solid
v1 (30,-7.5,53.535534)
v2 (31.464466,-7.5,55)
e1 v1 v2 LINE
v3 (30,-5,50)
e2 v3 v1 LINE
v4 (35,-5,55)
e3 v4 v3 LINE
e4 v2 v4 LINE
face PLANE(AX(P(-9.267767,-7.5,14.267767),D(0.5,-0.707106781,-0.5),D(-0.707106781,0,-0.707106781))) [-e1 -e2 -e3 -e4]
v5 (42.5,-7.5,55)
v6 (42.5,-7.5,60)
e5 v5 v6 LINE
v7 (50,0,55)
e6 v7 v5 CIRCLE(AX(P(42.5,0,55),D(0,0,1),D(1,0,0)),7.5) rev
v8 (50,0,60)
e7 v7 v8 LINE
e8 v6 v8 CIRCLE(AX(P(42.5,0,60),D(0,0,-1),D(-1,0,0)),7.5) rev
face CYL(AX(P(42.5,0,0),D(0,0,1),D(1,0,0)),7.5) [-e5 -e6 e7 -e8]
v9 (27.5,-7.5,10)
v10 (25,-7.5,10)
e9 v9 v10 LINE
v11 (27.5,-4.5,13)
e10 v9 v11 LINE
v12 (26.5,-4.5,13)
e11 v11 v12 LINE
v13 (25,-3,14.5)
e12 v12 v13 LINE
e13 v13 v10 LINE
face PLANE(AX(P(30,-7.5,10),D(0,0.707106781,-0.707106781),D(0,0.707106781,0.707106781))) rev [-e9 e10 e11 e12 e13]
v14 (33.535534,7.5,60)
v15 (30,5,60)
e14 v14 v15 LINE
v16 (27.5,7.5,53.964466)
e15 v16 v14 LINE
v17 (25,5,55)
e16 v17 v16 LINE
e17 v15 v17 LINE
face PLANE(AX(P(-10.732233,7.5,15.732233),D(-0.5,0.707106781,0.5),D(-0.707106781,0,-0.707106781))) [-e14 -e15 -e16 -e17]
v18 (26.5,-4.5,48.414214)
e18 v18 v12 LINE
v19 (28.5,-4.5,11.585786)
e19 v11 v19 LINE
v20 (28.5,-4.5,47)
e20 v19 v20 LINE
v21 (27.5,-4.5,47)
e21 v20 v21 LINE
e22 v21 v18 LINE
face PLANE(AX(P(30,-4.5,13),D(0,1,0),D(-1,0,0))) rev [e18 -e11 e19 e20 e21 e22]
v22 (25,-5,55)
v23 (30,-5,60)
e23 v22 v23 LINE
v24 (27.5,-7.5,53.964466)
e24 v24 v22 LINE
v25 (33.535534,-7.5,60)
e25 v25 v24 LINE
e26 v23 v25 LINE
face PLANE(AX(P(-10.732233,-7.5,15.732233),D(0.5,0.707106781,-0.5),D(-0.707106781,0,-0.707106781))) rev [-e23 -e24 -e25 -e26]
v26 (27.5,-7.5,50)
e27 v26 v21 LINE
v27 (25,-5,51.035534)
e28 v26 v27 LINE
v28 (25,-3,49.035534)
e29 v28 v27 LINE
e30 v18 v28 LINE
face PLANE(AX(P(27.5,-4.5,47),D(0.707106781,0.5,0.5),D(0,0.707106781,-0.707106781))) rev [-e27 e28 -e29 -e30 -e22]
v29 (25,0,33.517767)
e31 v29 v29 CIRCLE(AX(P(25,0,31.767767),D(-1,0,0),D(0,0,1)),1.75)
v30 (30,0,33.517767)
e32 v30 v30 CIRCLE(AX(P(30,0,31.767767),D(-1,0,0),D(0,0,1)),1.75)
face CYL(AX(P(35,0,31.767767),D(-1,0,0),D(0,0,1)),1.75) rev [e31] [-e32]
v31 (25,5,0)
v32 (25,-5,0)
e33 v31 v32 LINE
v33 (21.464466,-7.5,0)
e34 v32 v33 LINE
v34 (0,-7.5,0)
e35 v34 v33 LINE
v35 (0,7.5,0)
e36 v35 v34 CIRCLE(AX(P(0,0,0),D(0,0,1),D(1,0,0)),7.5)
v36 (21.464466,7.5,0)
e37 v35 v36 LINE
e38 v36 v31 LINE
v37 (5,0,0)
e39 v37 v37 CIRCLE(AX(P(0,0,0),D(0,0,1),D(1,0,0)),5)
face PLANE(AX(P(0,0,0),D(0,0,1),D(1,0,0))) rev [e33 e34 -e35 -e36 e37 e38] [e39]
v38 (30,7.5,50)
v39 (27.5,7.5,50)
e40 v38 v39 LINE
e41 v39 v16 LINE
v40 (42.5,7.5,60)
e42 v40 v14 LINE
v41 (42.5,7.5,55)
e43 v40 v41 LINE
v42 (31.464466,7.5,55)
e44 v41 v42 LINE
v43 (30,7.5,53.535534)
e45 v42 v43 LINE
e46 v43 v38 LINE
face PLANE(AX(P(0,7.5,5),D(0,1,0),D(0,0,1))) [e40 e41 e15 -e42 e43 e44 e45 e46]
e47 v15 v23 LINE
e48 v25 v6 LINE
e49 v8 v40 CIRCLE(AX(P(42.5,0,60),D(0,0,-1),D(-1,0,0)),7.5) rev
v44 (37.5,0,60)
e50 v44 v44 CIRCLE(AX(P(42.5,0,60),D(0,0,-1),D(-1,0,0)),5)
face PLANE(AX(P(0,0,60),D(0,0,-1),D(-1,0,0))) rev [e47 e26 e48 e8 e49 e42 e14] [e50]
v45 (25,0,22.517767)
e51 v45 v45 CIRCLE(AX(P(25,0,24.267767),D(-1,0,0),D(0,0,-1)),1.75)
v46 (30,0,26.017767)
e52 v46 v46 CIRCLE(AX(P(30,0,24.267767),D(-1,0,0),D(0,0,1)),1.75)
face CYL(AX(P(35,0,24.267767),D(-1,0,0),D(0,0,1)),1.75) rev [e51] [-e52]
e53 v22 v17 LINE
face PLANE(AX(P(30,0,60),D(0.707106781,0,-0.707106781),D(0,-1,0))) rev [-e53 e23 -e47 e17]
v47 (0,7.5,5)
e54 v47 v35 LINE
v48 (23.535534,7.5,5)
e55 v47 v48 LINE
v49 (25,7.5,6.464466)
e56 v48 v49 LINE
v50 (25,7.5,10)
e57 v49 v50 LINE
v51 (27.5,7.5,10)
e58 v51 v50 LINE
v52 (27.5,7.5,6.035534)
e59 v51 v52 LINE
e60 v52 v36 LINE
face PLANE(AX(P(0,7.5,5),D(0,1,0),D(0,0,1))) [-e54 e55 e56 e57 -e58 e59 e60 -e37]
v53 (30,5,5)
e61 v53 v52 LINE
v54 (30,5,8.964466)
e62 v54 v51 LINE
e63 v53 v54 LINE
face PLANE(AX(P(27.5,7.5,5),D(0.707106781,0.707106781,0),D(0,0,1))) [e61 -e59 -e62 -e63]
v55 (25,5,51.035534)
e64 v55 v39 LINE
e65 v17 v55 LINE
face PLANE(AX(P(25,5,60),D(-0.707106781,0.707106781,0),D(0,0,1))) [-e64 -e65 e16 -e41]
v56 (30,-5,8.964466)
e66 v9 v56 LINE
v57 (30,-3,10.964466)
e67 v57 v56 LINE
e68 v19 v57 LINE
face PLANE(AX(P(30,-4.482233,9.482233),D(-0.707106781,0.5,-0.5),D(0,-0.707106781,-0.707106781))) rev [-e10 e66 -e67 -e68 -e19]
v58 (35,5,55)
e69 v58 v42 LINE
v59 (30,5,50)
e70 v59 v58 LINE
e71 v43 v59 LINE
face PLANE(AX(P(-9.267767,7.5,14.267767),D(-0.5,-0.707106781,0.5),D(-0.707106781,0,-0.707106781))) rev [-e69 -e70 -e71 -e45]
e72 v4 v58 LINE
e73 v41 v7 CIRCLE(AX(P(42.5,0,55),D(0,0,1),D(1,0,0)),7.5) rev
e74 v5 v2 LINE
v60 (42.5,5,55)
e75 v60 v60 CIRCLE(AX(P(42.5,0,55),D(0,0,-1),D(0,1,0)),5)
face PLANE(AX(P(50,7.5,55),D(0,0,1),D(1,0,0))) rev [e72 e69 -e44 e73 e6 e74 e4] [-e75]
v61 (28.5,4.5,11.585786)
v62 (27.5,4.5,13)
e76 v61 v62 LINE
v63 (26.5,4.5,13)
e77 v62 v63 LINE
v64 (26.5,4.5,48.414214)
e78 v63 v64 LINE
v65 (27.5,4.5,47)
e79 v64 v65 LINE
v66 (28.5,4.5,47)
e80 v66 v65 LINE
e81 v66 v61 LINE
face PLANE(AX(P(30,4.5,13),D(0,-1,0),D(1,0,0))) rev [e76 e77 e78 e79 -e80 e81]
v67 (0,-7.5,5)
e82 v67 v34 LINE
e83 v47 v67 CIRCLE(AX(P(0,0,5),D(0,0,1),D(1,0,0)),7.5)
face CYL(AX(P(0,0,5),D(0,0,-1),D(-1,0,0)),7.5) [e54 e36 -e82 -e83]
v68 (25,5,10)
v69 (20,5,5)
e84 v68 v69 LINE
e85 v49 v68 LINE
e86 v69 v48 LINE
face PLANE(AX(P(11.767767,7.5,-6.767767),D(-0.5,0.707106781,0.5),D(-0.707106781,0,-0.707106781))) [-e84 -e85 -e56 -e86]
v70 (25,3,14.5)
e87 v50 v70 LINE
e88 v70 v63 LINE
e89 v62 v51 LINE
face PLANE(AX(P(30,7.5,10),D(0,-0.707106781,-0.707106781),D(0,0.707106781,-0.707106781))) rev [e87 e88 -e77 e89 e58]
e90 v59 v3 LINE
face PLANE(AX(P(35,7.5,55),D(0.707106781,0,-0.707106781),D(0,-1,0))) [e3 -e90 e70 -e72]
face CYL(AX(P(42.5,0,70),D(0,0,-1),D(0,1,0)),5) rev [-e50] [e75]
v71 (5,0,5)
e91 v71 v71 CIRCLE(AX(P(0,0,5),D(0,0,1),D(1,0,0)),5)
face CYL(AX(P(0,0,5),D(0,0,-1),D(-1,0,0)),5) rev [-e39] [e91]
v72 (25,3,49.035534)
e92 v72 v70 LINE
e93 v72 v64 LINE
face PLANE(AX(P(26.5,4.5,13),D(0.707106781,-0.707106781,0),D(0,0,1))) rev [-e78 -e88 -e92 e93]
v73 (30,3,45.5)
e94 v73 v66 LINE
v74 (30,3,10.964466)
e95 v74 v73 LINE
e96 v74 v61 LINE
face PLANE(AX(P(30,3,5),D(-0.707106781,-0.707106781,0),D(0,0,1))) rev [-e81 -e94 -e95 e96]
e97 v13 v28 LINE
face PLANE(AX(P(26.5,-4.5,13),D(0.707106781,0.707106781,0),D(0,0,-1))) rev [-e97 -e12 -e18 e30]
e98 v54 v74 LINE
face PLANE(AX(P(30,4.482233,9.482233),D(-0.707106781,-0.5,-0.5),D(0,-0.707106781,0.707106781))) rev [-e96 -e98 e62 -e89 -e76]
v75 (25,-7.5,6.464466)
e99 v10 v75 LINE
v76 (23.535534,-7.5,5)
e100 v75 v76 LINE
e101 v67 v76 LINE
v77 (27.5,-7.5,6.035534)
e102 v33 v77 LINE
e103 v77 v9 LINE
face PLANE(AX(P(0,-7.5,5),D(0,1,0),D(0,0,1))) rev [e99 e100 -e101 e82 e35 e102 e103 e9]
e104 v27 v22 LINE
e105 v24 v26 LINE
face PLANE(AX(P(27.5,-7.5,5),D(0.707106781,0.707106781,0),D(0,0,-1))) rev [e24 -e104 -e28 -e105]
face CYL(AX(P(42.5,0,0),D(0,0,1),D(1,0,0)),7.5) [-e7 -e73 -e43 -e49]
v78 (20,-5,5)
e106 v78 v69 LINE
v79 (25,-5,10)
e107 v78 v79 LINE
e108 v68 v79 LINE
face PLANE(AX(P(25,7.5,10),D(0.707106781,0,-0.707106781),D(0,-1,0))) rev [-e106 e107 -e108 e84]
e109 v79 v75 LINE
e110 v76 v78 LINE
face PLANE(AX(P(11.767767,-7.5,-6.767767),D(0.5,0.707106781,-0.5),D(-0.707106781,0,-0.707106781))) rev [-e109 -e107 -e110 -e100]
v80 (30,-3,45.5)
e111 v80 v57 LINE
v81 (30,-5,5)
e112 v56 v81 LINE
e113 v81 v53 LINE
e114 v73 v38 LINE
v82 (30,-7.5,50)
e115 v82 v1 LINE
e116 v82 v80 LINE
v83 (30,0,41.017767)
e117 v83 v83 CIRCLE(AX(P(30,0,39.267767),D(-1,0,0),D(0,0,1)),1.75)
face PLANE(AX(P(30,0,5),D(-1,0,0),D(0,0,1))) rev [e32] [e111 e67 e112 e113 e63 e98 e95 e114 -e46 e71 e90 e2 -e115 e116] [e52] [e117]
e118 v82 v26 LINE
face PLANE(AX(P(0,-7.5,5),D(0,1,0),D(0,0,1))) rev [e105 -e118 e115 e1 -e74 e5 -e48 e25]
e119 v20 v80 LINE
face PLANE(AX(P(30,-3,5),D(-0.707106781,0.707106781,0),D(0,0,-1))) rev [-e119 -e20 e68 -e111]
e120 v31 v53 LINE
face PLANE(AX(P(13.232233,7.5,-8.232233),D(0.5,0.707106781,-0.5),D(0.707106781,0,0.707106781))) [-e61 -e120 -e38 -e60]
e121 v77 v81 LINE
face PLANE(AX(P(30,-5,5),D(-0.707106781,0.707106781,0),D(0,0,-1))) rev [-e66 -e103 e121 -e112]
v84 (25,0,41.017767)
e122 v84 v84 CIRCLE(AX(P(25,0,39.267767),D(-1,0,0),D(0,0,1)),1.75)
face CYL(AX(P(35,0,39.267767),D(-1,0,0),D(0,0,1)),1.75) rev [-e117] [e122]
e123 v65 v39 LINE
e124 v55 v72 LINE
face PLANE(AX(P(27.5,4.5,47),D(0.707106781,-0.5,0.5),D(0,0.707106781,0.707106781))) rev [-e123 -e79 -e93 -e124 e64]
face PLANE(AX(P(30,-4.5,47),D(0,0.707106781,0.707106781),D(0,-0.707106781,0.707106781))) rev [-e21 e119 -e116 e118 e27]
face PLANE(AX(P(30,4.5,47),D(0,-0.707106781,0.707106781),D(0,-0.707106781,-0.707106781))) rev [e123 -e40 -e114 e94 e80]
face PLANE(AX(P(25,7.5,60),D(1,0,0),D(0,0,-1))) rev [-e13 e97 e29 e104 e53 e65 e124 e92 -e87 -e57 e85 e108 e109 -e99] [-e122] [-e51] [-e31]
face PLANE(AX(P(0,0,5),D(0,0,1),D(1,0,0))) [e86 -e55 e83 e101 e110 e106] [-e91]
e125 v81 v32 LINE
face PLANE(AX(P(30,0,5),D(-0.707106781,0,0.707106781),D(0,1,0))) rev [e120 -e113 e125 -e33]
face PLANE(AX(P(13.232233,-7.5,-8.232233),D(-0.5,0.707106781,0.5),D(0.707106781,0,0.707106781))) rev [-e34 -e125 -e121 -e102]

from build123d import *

# Parameters (mm, degrees)
SKETCH1_R           = 7.5
SKETCH1_R_2         = 5
BOSS_EXTRUDE1_DEPTH = 5
SKETCH2_W           = 5
SKETCH2_H           = 15
BOSS_EXTRUDE2_DEPTH = 55
SKETCH3_W           = 5
SKETCH3_H           = 15
BOSS_EXTRUDE3_DEPTH = 20
SKETCH4_R           = 5
CUT_EXTRUDE1_DEPTH  = 15
FILLET1_R           = 7.5
CHAMFER1_SIZE       = 5
CUT_EXTRUDE2_DEPTH  = 5
CHAMFER2_SIZE       = 1.5
CHAMFER3_SIZE       = 2.5
CHAMFER4_SIZE       = 2.5
SKETCH6_R           = 1.75
CUT_EXTRUDE3_DEPTH  = 10


with BuildPart() as part:
    # Sketch1 → Boss-Extrude1 (new body)
    # profile 1 of 2: a face of its own
    with BuildSketch(Plane.XY):
        Circle(SKETCH1_R)
        Circle(SKETCH1_R_2, mode=Mode.SUBTRACT)
    # profile 2 of 2: a face of its own
    with BuildSketch(Plane.XY):
        with BuildLine():
            Line((30, 7.5), (0, 7.5))
            ThreePointArc((0, 7.5), (5.303300859, 5.303300859), (7.5, 0))
            ThreePointArc((7.5, 0), (5.303300859, -5.303300859), (0, -7.5))
            Line((0, -7.5), (30, -7.5))
            Line((30, -7.5), (30, 7.5))
        make_face()
    extrude(amount=BOSS_EXTRUDE1_DEPTH)

    # Sketch2 → Boss-Extrude2 (add)
    with BuildSketch(Plane.XY.offset(5)):
        with Locations((27.5, 0)):
            Rectangle(SKETCH2_W, SKETCH2_H)
    extrude(amount=BOSS_EXTRUDE2_DEPTH)

    # Sketch3 → Boss-Extrude3 (add)
    with BuildSketch(Plane(origin=(30, 0, 0), x_dir=(0, 0, -1), z_dir=(1, 0, 0))):
        with Locations((-57.5, 0)):
            Rectangle(SKETCH3_W, SKETCH3_H)
    extrude(amount=BOSS_EXTRUDE3_DEPTH)

    # Sketch4 → Cut-Extrude1 (cut)
    with BuildSketch(Plane(origin=(0, 0, 55), x_dir=(-1, 0, 0), z_dir=(0, 0, -1))):
        with Locations(Location((-42.5, 0, 0), (0, 0, 90))):
            Circle(SKETCH4_R)
    extrude(amount=-CUT_EXTRUDE1_DEPTH, mode=Mode.SUBTRACT)

    # Fillet1
    fillet1_edges = [part.edges().sort_by_distance(p)[0] for p in [
        (50, -7.5, 57.5),
        (50, 7.5, 57.5),
    ]]
    fillet(fillet1_edges, radius=FILLET1_R - 0.0001)  # a hair under: the kernel refuses the full size

    # Chamfer1
    chamfer1_edges = [part.edges().sort_by_distance(p)[0] for p in [
        (25, 0, 5),
        (25, 0, 60),
        (30, 0, 55),
        (30, 0, 0),
    ]]
    chamfer(chamfer1_edges, length=CHAMFER1_SIZE)

    # Sketch5 → Cut-Extrude2 (cut)
    with BuildSketch(Plane.ZY.offset(-25)):
        Polygon((10, -7.5), (13, -4.5), (47, -4.5), (50, -7.5), align=None)
        Polygon((50, 7.5), (10, 7.5), (13, 4.5), (47, 4.5), align=None)
    extrude(amount=-CUT_EXTRUDE2_DEPTH, mode=Mode.SUBTRACT)

    # Chamfer2
    chamfer2_edges = [part.edges().sort_by_distance(p)[0] for p in [
        (25, -4.5, 30),
        (30, 4.5, 30),
        (25, 4.5, 30),
        (30, -4.5, 30),
    ]]
    chamfer(chamfer2_edges, length=CHAMFER2_SIZE)

    # Chamfer3
    chamfer3_edges = [part.edges().sort_by_distance(p)[0] for p in [
        (30, 5.25, 12.25),
        (25, 5.25, 47.75),
        (25, 7.5, 52.5),
        (27.5, 7.5, 57.5),
        (27.5, 7.5, 2.5),
        (25, -7.5, 52.5),
        (27.5, -7.5, 57.5),
        (27.5, -7.5, 2.5),
        (30, 7.5, 7.5),
        (30, -7.5, 7.5),
        (30, -5.25, 12.25),
        (25, -5.25, 47.75),
    ]]
    chamfer(chamfer3_edges, length=CHAMFER3_SIZE)

    # Chamfer4
    chamfer4_edges = [part.edges().sort_by_distance(p)[0] for p in [
        (22.5, -7.5, 7.5),
        (22.5, 7.5, 7.5),
        (32.5, 7.5, 52.5),
        (32.5, -7.5, 52.5),
    ]]
    chamfer(chamfer4_edges, length=CHAMFER4_SIZE)

    # Sketch6 → Cut-Extrude3 (cut)
    with BuildSketch(Plane.ZY.offset(-25)):
        with Locations((31.767766953, 0)):
            Circle(SKETCH6_R)
        with Locations((39.267766953, 0)):
            Circle(SKETCH6_R)
        with Locations((24.267766953, 0)):
            Circle(SKETCH6_R)
    extrude(amount=-CUT_EXTRUDE3_DEPTH, mode=Mode.SUBTRACT)


solid = part.part
